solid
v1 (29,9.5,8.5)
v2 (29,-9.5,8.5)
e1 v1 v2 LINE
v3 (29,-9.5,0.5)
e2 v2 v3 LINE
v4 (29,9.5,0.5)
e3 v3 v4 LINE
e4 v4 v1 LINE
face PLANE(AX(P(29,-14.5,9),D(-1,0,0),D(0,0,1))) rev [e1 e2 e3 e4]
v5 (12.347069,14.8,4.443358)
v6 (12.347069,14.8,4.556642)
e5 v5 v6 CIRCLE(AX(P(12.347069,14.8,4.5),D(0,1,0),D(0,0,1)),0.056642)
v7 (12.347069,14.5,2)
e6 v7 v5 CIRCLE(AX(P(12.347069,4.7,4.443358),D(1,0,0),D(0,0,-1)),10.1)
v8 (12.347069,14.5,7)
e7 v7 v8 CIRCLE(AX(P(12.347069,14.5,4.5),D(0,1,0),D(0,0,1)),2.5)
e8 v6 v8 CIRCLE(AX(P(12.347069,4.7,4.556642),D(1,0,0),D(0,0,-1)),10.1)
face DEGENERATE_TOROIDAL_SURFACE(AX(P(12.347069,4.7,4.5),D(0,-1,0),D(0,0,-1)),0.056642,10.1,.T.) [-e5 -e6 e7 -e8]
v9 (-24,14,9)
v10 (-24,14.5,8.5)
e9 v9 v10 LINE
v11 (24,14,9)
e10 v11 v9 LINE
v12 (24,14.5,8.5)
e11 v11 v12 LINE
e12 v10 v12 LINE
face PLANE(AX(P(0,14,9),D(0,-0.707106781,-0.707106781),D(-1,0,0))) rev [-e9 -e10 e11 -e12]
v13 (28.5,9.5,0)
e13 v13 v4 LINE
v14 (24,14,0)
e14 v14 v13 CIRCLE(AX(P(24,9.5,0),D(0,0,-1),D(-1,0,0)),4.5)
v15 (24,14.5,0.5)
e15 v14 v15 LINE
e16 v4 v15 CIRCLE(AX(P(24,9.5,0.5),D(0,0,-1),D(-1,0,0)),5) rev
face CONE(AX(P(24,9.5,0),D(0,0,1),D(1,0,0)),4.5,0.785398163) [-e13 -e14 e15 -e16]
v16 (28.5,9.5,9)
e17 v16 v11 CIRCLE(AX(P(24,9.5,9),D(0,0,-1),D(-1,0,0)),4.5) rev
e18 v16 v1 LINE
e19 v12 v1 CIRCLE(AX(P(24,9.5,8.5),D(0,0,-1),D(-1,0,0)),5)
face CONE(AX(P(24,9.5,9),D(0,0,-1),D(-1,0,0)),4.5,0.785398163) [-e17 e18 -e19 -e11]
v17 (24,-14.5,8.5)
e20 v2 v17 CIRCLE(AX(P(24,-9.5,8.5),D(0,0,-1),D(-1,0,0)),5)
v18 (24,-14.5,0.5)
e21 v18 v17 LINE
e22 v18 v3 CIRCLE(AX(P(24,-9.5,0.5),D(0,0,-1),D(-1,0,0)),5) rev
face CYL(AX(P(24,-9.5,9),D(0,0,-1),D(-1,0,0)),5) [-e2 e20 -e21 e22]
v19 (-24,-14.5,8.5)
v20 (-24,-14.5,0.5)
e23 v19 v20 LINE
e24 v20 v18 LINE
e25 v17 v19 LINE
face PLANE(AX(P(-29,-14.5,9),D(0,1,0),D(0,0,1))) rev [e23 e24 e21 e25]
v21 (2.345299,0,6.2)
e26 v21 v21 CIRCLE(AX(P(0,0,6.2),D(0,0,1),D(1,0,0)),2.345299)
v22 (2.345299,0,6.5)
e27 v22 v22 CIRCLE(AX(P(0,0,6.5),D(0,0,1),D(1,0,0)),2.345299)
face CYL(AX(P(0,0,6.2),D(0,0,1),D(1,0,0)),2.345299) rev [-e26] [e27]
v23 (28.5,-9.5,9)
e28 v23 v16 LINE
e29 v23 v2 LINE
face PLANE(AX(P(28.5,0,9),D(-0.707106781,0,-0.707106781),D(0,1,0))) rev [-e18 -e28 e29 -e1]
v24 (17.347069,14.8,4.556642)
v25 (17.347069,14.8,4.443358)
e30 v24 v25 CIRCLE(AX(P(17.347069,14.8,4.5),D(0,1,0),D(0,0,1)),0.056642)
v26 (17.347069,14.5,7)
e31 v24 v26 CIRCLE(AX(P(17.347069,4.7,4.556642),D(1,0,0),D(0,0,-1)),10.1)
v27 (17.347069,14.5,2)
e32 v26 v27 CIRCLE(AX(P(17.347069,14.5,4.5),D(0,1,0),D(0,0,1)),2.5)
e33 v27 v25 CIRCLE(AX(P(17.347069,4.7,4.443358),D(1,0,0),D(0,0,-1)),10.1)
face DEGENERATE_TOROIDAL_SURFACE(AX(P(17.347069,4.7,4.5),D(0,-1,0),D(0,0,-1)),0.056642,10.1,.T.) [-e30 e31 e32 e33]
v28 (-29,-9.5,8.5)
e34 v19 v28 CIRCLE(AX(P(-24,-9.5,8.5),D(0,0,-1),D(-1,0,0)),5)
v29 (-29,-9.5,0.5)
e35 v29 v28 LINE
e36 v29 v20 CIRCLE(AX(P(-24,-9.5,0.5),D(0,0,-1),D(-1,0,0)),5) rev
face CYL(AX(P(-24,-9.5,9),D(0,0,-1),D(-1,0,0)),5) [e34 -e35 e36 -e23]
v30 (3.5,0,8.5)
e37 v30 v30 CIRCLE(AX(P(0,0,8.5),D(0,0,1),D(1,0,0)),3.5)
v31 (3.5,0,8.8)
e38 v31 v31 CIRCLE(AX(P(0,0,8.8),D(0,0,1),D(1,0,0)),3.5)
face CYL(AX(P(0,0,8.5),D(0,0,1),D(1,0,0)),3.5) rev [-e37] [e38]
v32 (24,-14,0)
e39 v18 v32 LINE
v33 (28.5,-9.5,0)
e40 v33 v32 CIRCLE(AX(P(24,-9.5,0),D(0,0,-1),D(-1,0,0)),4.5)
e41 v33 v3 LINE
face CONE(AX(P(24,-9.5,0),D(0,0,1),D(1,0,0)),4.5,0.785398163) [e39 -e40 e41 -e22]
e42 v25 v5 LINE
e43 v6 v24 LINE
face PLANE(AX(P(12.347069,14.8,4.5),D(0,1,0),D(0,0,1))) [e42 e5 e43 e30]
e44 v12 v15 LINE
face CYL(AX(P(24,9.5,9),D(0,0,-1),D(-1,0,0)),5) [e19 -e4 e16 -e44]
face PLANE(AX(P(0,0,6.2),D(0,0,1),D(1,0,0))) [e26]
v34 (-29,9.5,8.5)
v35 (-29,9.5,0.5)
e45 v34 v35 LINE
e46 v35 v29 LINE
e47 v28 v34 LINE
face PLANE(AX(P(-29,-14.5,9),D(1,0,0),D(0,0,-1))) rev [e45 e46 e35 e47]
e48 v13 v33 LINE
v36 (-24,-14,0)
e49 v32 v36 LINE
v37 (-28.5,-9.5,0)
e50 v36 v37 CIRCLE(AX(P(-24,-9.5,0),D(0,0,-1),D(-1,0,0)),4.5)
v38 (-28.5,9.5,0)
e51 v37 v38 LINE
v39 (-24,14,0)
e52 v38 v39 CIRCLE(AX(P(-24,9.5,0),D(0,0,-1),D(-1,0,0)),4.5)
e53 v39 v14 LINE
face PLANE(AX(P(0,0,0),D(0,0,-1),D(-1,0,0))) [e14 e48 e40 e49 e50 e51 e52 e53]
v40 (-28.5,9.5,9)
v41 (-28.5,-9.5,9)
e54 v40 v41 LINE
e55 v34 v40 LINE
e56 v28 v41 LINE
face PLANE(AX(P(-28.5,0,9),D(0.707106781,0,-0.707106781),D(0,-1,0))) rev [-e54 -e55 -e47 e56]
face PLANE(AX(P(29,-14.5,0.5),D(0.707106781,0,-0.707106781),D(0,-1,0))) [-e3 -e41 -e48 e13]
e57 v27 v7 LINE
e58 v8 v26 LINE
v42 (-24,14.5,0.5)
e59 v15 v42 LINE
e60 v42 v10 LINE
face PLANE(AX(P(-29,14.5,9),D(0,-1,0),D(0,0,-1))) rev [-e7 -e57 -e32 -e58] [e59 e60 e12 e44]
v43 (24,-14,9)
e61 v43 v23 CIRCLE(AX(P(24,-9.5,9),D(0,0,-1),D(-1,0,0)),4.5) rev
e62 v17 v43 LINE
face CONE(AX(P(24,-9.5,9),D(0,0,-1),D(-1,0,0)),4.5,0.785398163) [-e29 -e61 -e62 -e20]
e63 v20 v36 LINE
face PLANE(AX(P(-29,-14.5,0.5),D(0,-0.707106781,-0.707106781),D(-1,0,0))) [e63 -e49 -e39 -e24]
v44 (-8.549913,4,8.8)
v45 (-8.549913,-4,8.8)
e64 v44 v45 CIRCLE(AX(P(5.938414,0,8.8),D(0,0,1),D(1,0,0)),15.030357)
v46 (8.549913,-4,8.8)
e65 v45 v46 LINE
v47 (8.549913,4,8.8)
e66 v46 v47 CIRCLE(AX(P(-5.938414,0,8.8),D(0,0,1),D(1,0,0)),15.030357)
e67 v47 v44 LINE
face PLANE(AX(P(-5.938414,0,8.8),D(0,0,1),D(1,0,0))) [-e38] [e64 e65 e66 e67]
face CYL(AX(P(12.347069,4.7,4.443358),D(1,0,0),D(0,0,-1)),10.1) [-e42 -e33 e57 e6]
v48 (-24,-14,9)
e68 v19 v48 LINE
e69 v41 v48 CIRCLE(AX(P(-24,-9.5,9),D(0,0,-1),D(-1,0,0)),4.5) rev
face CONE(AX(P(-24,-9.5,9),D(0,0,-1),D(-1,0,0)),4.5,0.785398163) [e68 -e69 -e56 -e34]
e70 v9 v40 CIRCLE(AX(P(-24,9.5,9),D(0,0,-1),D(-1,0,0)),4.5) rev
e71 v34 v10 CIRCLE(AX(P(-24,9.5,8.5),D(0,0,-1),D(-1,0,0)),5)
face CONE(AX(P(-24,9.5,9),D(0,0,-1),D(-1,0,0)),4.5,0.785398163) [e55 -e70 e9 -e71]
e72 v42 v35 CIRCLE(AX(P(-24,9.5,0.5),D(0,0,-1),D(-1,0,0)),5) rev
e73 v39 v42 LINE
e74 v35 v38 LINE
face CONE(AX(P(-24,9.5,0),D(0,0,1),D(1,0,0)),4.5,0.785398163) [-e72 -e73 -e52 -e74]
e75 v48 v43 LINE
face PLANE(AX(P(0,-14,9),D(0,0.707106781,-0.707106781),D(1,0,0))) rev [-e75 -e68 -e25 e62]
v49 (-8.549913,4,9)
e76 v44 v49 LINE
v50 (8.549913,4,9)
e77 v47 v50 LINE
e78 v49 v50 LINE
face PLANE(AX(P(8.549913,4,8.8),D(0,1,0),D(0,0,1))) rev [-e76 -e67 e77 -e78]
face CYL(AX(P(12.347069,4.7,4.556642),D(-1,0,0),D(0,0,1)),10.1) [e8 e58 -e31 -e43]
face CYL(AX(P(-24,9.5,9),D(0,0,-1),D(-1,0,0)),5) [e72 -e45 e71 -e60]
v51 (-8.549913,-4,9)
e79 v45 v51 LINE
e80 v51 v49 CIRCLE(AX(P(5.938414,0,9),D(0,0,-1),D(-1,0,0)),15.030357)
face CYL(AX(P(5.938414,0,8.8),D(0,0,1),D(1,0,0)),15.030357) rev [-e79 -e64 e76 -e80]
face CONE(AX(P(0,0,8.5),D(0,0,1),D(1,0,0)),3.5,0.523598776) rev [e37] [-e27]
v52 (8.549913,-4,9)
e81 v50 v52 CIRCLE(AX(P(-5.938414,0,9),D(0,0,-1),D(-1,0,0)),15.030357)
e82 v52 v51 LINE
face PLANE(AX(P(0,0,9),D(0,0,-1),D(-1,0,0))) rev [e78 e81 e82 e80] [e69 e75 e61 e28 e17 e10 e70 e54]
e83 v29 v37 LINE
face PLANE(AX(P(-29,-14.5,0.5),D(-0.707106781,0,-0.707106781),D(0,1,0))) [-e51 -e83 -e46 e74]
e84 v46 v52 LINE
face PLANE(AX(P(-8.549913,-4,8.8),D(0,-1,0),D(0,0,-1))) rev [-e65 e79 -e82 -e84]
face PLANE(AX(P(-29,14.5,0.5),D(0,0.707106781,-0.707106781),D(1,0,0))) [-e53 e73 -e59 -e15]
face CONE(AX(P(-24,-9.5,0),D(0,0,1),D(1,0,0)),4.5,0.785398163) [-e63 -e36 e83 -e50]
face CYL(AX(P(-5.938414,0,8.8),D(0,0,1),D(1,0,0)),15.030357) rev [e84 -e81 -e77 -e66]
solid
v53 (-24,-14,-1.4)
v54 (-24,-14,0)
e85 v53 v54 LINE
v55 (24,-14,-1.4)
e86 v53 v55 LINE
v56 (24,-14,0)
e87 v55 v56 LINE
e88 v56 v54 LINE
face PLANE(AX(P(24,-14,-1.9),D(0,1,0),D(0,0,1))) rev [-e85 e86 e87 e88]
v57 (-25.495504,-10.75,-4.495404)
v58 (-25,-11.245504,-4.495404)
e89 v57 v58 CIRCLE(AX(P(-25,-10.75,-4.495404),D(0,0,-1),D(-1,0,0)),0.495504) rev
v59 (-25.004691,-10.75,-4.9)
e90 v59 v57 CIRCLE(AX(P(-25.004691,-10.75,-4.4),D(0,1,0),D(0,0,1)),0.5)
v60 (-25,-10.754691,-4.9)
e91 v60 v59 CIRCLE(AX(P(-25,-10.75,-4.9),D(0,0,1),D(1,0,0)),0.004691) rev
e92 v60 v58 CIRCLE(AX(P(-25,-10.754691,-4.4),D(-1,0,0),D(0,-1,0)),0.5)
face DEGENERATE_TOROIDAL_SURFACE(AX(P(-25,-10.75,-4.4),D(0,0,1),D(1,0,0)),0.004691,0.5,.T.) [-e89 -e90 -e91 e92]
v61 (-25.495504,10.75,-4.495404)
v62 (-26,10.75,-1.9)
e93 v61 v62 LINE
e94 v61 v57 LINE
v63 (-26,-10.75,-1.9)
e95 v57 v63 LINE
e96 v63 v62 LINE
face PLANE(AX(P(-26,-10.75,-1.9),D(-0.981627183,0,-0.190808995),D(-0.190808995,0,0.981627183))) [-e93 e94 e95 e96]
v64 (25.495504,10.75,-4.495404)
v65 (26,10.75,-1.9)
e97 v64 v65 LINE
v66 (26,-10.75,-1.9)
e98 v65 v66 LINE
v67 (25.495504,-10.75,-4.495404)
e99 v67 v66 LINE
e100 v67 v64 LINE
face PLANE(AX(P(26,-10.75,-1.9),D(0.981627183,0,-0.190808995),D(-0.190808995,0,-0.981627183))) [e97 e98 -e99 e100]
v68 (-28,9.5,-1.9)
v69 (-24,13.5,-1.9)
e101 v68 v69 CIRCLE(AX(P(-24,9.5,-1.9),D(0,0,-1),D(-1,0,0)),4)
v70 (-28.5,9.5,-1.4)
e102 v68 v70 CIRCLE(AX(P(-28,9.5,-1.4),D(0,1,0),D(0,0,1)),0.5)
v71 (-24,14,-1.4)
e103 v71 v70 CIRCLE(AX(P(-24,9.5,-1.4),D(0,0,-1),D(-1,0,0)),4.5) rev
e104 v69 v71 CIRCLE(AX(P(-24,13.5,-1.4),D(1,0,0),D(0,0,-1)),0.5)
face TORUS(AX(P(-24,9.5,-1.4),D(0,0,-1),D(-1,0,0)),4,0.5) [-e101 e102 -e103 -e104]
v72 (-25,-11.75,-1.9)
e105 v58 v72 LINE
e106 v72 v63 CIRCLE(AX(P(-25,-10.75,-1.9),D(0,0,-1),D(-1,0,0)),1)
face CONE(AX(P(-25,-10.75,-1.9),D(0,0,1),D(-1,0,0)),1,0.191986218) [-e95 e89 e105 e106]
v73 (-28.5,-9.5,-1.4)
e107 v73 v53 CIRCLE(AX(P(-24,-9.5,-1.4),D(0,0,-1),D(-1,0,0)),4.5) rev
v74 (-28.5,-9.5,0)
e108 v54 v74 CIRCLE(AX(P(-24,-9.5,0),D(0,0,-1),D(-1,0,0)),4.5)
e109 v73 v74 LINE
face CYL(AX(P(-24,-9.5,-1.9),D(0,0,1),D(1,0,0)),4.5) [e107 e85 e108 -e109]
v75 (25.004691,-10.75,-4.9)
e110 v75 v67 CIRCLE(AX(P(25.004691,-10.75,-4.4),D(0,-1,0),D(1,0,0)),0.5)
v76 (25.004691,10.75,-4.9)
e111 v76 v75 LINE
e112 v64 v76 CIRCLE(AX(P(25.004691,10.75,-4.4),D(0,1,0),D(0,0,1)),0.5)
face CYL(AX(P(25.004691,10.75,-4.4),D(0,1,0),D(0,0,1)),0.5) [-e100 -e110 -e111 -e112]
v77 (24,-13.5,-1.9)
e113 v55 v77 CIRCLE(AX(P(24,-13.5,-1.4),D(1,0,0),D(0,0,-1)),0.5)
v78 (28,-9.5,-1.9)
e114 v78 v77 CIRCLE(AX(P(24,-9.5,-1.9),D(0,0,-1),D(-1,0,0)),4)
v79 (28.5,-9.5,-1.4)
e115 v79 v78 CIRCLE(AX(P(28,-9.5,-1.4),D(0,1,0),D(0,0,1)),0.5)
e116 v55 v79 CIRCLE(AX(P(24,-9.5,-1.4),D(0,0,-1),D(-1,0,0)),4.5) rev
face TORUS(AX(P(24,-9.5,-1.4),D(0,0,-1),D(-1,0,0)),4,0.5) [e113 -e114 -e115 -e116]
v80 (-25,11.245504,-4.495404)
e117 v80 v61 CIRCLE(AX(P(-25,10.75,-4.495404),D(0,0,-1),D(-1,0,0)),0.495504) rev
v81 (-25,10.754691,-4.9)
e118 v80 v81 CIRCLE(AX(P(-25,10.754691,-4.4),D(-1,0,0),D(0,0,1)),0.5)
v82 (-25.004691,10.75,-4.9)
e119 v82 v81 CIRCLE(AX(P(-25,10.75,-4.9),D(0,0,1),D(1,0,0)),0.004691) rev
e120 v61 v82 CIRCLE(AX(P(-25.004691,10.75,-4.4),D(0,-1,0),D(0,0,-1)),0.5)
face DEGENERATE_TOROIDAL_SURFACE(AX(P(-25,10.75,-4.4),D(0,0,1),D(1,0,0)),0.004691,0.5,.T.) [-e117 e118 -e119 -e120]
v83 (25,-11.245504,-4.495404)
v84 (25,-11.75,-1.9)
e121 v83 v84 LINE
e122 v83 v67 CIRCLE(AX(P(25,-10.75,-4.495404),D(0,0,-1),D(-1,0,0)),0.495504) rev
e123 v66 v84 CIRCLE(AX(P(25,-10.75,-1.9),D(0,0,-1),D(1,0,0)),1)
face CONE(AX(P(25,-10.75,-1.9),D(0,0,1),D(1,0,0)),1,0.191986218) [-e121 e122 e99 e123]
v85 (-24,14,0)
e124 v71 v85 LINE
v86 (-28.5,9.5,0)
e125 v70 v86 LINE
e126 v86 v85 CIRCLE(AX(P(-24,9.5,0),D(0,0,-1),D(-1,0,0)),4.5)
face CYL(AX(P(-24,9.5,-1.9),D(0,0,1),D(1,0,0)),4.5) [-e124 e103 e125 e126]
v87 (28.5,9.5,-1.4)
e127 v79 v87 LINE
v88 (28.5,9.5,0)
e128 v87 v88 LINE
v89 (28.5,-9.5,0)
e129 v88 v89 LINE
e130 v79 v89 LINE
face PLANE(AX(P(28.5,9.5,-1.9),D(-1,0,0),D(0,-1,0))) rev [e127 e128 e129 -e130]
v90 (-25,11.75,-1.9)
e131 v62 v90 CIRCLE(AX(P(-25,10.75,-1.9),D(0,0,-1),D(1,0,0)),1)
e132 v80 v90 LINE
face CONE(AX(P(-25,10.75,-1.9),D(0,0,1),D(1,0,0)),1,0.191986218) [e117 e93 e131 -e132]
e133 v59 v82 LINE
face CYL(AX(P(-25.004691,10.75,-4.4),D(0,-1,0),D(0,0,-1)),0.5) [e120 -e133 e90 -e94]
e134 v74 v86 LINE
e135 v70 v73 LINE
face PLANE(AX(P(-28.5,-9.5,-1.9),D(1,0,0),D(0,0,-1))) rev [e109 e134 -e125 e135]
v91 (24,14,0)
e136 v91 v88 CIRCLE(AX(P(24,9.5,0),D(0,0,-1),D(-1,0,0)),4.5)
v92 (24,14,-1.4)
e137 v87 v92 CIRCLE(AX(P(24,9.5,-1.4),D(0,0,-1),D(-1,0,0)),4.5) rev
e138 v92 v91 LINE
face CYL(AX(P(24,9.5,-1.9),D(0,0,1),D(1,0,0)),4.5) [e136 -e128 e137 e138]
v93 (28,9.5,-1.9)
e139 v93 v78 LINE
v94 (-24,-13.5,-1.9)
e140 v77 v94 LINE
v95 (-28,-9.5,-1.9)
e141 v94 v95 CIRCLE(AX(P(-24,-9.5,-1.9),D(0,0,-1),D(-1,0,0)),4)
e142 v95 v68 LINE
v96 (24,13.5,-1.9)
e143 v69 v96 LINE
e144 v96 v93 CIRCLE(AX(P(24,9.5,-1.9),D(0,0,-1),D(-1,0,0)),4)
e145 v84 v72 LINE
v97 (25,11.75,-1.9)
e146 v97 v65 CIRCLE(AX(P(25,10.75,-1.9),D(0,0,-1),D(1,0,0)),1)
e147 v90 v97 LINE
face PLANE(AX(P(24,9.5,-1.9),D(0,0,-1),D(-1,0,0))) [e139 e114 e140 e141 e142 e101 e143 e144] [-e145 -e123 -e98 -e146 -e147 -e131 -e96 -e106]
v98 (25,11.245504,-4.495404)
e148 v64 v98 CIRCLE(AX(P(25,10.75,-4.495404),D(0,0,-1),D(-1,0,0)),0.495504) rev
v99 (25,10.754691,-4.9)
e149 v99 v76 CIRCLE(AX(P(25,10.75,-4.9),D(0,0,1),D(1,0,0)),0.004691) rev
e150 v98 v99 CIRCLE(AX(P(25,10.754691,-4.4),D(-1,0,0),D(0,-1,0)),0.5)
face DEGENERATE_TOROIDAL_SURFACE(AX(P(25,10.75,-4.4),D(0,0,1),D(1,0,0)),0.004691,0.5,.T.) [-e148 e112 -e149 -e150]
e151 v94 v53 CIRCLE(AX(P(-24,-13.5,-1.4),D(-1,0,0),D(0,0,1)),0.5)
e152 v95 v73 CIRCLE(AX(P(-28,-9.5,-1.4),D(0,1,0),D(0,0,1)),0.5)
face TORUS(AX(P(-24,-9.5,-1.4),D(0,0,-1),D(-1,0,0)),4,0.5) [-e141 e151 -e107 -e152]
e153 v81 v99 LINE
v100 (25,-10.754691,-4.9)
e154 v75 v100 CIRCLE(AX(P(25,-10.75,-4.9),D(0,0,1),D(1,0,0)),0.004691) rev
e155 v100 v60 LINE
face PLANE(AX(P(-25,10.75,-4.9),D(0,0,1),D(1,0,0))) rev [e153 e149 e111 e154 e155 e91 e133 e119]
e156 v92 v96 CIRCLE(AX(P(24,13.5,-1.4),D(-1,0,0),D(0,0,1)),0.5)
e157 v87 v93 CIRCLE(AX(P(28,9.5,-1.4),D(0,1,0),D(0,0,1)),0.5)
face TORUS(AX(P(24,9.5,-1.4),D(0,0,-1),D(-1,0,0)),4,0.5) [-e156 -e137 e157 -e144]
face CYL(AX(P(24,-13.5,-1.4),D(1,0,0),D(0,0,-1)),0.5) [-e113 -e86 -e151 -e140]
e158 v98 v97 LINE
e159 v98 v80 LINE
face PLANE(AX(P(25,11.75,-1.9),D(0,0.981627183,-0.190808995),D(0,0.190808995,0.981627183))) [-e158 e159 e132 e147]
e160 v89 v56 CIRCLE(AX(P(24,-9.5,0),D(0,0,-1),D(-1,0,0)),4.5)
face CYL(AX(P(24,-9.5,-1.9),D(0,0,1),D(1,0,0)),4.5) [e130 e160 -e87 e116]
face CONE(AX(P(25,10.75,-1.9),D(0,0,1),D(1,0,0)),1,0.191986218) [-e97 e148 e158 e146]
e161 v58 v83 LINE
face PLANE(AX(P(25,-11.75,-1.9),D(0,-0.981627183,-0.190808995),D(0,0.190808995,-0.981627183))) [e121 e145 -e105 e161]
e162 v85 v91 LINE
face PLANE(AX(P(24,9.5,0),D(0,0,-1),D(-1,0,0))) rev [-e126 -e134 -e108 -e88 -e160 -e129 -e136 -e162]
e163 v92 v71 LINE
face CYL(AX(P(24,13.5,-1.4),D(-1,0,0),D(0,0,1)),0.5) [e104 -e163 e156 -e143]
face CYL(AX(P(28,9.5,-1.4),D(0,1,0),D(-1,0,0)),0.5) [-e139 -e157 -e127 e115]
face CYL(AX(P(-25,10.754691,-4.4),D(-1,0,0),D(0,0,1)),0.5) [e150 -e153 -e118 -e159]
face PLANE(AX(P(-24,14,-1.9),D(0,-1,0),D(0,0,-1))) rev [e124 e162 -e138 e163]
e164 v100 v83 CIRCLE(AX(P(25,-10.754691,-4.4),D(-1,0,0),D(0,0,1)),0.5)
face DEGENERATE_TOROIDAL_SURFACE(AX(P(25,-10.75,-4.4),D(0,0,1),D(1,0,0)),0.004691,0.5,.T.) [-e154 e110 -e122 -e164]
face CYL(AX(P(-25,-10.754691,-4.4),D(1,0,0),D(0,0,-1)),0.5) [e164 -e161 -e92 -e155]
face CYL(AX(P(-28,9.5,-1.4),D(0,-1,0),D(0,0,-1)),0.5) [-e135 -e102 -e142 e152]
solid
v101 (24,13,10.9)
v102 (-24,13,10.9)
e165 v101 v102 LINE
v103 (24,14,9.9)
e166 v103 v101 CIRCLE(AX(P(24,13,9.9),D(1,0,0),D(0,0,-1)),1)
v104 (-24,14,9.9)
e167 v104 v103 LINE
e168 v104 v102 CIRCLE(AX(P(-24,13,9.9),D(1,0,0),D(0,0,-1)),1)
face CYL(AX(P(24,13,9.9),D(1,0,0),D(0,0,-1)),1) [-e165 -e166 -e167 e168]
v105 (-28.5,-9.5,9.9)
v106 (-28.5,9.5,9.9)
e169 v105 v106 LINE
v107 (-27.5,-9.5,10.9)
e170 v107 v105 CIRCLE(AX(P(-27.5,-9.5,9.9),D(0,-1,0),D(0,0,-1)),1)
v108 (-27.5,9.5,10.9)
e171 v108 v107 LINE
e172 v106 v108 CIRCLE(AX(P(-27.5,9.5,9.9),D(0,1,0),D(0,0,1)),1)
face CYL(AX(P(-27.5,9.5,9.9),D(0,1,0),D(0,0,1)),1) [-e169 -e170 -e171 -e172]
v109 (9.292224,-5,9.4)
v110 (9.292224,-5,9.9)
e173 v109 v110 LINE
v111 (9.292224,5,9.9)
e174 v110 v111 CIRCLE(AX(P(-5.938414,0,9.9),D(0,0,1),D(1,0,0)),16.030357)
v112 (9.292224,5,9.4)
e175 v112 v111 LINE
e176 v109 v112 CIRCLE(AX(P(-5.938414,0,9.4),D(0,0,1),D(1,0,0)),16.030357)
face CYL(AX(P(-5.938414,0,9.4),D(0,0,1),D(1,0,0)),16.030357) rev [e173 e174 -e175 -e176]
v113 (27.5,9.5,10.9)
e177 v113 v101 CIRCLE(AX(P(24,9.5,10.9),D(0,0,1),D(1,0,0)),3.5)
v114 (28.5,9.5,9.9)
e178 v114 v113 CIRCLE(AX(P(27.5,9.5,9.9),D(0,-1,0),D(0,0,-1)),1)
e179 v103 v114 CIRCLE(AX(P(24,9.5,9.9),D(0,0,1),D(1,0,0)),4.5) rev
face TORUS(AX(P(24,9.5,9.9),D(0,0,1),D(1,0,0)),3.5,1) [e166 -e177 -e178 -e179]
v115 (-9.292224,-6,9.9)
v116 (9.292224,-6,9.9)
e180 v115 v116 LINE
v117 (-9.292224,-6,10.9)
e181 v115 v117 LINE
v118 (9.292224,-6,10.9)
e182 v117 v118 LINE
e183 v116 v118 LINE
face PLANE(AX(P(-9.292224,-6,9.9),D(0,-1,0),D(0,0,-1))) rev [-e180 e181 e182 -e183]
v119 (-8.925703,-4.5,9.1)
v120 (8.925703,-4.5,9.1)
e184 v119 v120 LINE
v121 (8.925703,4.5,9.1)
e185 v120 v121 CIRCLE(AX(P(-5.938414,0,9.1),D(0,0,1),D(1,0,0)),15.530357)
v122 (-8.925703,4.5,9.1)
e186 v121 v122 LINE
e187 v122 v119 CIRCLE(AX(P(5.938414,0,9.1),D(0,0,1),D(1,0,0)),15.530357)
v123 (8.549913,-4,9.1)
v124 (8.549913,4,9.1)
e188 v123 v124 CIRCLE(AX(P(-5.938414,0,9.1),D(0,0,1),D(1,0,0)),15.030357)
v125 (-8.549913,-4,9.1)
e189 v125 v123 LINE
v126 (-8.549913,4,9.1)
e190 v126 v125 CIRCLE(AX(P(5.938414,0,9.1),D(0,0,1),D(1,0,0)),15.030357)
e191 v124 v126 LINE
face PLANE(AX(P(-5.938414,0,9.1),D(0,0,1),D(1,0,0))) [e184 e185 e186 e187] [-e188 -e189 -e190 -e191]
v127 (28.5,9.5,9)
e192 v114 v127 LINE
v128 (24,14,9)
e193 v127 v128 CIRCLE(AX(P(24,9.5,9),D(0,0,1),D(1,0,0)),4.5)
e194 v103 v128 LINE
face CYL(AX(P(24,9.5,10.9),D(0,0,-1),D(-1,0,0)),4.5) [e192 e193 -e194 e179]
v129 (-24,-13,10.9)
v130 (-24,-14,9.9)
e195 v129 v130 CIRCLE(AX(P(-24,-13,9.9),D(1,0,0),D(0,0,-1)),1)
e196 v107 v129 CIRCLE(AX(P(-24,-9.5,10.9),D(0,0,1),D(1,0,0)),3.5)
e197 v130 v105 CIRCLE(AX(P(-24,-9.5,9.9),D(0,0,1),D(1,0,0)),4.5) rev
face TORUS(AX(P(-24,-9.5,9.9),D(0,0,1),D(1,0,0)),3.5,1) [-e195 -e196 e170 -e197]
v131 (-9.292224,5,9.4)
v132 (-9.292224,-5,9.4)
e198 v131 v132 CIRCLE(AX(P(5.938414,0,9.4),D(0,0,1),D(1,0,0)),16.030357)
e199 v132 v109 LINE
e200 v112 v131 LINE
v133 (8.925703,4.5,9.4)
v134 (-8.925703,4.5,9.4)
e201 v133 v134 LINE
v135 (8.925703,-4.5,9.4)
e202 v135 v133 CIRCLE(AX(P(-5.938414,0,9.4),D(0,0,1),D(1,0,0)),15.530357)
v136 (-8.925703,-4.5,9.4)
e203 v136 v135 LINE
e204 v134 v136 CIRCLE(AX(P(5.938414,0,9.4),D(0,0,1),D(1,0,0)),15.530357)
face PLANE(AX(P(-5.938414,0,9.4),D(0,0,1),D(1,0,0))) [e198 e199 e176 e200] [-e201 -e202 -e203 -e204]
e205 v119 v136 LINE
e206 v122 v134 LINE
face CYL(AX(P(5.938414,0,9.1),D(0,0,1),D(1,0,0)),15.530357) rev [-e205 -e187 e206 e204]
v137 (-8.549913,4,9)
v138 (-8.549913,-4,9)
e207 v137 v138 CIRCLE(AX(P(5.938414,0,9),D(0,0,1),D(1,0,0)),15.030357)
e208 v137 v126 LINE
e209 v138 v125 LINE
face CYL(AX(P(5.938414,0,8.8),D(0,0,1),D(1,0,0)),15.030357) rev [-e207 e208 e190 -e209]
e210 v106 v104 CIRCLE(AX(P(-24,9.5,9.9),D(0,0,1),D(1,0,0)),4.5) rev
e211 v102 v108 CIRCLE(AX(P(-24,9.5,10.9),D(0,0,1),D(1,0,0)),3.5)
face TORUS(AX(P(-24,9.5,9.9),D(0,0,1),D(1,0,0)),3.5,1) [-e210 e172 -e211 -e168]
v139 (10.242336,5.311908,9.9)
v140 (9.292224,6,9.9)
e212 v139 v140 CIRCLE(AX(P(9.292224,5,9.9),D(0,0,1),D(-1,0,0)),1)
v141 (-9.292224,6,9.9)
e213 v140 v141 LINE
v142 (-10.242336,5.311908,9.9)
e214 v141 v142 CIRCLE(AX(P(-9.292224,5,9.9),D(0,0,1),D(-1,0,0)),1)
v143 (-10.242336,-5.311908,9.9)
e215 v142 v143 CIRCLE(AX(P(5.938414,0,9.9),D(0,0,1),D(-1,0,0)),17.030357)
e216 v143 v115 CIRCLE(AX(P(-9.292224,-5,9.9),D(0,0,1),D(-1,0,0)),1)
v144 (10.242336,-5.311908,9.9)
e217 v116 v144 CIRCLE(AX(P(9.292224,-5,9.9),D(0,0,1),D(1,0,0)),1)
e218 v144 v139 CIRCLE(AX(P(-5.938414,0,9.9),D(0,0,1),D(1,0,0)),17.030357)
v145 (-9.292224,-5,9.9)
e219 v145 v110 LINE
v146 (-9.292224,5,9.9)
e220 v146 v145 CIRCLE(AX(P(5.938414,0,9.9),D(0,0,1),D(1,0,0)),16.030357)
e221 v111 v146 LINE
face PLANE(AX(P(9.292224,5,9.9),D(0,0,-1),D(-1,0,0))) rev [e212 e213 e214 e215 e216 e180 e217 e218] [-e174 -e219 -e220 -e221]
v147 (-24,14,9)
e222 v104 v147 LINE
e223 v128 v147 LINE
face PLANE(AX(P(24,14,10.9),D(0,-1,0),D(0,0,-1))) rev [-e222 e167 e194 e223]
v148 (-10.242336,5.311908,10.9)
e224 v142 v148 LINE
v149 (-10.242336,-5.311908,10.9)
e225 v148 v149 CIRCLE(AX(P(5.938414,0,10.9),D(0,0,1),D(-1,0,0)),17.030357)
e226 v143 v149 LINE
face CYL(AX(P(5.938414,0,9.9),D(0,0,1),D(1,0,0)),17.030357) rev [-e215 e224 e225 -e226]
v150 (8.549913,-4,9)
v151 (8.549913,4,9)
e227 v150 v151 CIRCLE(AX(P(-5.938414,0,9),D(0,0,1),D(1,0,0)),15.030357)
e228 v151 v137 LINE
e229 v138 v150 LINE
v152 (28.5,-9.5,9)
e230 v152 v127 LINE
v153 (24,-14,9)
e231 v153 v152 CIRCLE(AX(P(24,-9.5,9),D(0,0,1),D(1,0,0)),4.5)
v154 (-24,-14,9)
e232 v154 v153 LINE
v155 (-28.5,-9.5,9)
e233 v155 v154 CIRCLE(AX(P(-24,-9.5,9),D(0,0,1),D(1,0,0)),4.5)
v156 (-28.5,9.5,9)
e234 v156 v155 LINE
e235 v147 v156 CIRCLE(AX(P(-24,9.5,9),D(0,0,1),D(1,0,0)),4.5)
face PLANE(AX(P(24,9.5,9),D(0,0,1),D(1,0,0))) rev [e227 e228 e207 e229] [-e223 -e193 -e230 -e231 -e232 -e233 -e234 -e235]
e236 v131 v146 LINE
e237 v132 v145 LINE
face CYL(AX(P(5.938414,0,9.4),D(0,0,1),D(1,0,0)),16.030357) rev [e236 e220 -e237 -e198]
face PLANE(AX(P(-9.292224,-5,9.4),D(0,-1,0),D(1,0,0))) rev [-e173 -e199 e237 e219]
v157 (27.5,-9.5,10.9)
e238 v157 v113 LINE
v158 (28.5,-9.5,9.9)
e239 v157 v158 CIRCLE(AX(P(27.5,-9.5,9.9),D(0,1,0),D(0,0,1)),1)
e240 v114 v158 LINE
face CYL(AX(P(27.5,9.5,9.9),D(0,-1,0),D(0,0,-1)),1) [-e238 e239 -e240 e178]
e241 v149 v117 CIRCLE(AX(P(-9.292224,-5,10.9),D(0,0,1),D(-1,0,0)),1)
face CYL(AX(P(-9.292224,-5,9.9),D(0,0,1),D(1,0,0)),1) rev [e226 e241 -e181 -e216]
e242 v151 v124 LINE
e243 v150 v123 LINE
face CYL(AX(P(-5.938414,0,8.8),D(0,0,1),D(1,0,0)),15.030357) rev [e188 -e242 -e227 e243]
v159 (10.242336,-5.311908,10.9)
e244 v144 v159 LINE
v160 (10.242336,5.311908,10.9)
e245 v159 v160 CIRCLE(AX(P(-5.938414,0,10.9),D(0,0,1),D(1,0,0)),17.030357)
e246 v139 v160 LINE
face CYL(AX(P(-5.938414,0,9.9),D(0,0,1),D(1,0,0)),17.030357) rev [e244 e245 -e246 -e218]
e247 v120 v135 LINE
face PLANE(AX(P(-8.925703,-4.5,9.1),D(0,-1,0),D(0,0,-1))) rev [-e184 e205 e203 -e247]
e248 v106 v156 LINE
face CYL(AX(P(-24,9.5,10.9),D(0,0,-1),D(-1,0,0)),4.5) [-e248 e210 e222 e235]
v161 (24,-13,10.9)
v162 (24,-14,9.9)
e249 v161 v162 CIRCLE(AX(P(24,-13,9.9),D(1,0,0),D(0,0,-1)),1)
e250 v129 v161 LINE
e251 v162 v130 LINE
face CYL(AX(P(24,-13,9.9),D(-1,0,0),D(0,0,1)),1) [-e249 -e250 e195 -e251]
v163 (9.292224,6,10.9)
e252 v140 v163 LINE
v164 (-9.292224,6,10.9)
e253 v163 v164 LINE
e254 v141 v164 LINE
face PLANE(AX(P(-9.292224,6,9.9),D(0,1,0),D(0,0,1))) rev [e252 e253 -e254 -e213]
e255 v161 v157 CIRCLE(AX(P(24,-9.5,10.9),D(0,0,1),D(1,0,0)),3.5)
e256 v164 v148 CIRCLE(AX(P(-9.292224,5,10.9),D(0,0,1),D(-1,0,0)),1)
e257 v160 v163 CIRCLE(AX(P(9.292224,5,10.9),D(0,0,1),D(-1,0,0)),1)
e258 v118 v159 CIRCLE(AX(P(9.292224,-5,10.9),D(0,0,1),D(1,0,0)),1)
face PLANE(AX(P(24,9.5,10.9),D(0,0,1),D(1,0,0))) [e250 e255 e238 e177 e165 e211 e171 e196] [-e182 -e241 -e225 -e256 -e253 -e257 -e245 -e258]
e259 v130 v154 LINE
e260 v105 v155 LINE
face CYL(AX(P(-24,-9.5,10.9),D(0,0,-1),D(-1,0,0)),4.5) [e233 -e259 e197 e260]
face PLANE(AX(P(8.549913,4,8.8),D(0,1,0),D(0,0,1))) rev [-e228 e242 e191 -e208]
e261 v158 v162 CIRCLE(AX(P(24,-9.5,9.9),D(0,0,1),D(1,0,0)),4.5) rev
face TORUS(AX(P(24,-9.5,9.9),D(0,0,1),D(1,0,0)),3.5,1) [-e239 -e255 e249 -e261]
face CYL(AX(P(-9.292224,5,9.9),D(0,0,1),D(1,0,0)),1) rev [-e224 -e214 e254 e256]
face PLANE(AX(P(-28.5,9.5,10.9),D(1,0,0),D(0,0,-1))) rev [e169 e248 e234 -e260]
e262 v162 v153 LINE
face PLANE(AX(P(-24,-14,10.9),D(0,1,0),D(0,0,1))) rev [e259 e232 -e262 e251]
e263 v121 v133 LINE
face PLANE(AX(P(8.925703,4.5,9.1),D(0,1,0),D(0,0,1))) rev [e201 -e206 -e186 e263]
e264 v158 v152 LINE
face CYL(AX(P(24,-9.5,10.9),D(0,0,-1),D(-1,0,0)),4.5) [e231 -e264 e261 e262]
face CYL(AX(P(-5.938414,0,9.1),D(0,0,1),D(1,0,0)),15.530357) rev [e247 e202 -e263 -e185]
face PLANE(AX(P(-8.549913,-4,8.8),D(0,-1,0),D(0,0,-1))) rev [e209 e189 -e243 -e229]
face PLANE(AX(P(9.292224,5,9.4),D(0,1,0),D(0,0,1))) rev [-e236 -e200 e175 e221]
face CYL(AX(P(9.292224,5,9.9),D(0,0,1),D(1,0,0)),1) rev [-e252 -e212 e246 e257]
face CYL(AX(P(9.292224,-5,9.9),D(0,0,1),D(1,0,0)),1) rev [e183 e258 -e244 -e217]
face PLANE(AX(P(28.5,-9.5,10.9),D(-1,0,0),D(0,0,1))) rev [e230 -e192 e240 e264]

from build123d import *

# Parameters (mm, degrees)
SKETCH_1_W          = 58
SKETCH_1_H          = 29
EXTRUDE_1_DEPTH     = 9
FILLET_1_R          = 5
CHAMFER_1_SIZE      = 0.5
EXTRUDE_2_DEPTH     = 1.9
FILLET_2_R          = 1
EXTRUDE_3_DEPTH     = 1.9
FILLET_3_R          = 0.5
EXTRUDE_4_DEPTH     = 3
EXTRUDE_4_TAPER     = 11.000000000000002
FILLET_4_R          = 0.5
CUT_EXTRUDE_1_DEPTH = 1
CUT_EXTRUDE_2_DEPTH = 0.5
CUT_EXTRUDE_3_DEPTH = 0.3
CUT_EXTRUDE_4_DEPTH = 0.3
SKETCH_9_R          = 3.5
CUT_EXTRUDE_5_DEPTH = 0.3
SKETCH_10_R         = 3.5
CUT_EXTRUDE_6_DEPTH = 2
CUT_EXTRUDE_6_DRAFT = -30.000000000000068
SKETCH_11_R         = 2.345299461620746
CUT_EXTRUDE_7_DEPTH = 0.3
EXTRUDE_5_DEPTH     = 0.3
FILLET_5_R          = 10.1


with BuildPart() as part:
    # 스케치1 → 보스-돌출1 (new body)
    with BuildSketch(Plane.XY):
        Rectangle(SKETCH_1_W, SKETCH_1_H)
    extrude(amount=EXTRUDE_1_DEPTH)

    # 필렛1
    fillet_1_edges = [part.edges().sort_by_distance(p)[0] for p in [
        (29.00000000000001, -14.499999999999998, 4.5),
        (-28.999999999999986, -14.499999999999998, 4.5),
        (-28.999999999999986, 14.500000000000002, 4.5),
        (29.00000000000001, 14.500000000000002, 4.5),
    ]]
    fillet(fillet_1_edges, radius=FILLET_1_R)

    # 모따기1
    chamfer_1_edges = [part.edges().sort_by_distance(p)[0] for p in [
        (1.421e-14, -14.499999999999998, 0),
        (1.421e-14, -14.499999999999998, 9),
        (29.00000000000001, 0, 0),
        (-28.999999999999986, 3.55e-15, 0),
        (1.066e-14, 14.500000000000002, 0),
        (-27.535533905932724, 13.035533905932741, 0),
        (27.53553390593275, 13.035533905932741, 0),
        (27.535533905932752, -13.035533905932738, 0),
        (-27.535533905932724, -13.035533905932738, 0),
        (-28.999999999999986, 3.55e-15, 9),
        (29.00000000000001, 0, 9),
        (1.066e-14, 14.500000000000002, 9),
        (-27.535533905932724, 13.035533905932741, 9),
        (27.53553390593275, 13.035533905932741, 9),
        (27.535533905932752, -13.035533905932738, 9),
        (-27.535533905932724, -13.035533905932738, 9),
    ]]
    chamfer(chamfer_1_edges, length=CHAMFER_1_SIZE)


with BuildPart() as body_2:
    # 스케치2 → 보스-돌출2 (new body)
    with BuildSketch(Plane.XY.offset(9)):
        with BuildLine():
            Line((24.000000000000007, 14.000000000000009), (-23.999999999999982, 14.000000000000009))
            ThreePointArc((-23.999999999999982, 14.000000000000009), (-27.18198051533945, 12.681980515339472), (-28.49999999999999, 9.500000000000002))
            Line((-28.49999999999999, 9.500000000000002), (-28.49999999999999, -9.499999999999998))
            ThreePointArc((-28.49999999999999, -9.499999999999998), (-27.18198051533945, -12.681980515339466), (-23.999999999999982, -14.000000000000005))
            Line((-23.999999999999982, -14.000000000000005), (24.000000000000007, -14.000000000000005))
            ThreePointArc((24.000000000000007, -14.000000000000005), (27.18198051533948, -12.681980515339468), (28.500000000000018, -9.499999999999998))
            Line((28.500000000000018, -9.499999999999998), (28.500000000000018, 9.500000000000002))
            ThreePointArc((28.500000000000018, 9.500000000000002), (27.18198051533948, 12.681980515339472), (24.000000000000007, 14.000000000000009))
        make_face()
    extrude(amount=EXTRUDE_2_DEPTH)

    # 필렛2
    fillet_2_edges = [body_2.edges().sort_by_distance(p)[0] for p in [
        (-27.18198051533945, 12.681980515339472, 10.9),
        (-28.49999999999999, 1.78e-15, 10.9),
        (-27.18198051533945, -12.681980515339466, 10.9),
        (1.066e-14, -14.000000000000005, 10.9),
        (27.18198051533948, -12.681980515339468, 10.9),
        (28.500000000000018, 1.78e-15, 10.9),
        (27.18198051533948, 12.681980515339472, 10.9),
        (1.421e-14, 14.000000000000009, 10.9),
    ]]
    fillet(fillet_2_edges, radius=FILLET_2_R)

    # 스케치5 → 컷-돌출1 (cut)
    with BuildSketch(Plane.XY.offset(10.9)):
        with BuildLine():
            Line((-9.292223801942907, -6), (9.292223801942903, -6))
            ThreePointArc((9.292223801942903, -6), (9.878778053424123, -5.809909939480499), (10.242336038581271, -5.311908220138612))
            ThreePointArc((10.242336038581271, -5.311908220138612), (11.091942439359082, 0), (10.242336038581271, 5.311908220138612))
            ThreePointArc((10.242336038581271, 5.311908220138612), (9.878778053424123, 5.809909939480499), (9.292223801942903, 6))
            Line((9.292223801942903, 6), (-9.292223801942907, 6))
            ThreePointArc((-9.292223801942907, 6), (-9.878778053424126, 5.809909939480499), (-10.242336038581275, 5.311908220138612))
            ThreePointArc((-10.242336038581275, 5.311908220138612), (-11.091942439359089, -2.09e-15), (-10.242336038581275, -5.311908220138612))
            ThreePointArc((-10.242336038581275, -5.311908220138612), (-9.878778053424126, -5.8099099394805), (-9.292223801942907, -6))
        make_face()
    extrude(amount=-CUT_EXTRUDE_1_DEPTH, mode=Mode.SUBTRACT)

    # 스케치6 → 컷-돌출2 (cut)
    with BuildSketch(Plane.XY.offset(9.899999999999999)):
        with BuildLine():
            Line((9.292223801942903, 5), (-9.292223801942907, 5))
            ThreePointArc((-9.292223801942907, 5), (-10.091942439359086, 1.96e-15), (-9.292223801942907, -4.999999999999998))
            Line((-9.292223801942907, -4.999999999999998), (9.292223801942903, -5))
            ThreePointArc((9.292223801942903, -5), (10.091942439359086, -1.78e-15), (9.292223801942903, 5))
        make_face()
    extrude(amount=-CUT_EXTRUDE_2_DEPTH, mode=Mode.SUBTRACT)

    # 스케치7 → 컷-돌출3 (cut)
    with BuildSketch(Plane.XY.offset(9.399999999999999)):
        with BuildLine():
            Line((8.92570290507378, 4.500000000000001), (-8.925702905073786, 4.500000000000001))
            ThreePointArc((-8.925702905073786, 4.500000000000001), (-9.591942439359087, 1.9e-15), (-8.92570290507379, -4.499999999999992))
            Line((-8.92570290507379, -4.499999999999992), (8.925702905073784, -4.499999999999992))
            ThreePointArc((8.925702905073784, -4.499999999999992), (9.591942439359084, 4.31e-15), (8.92570290507378, 4.500000000000001))
        make_face()
    extrude(amount=-CUT_EXTRUDE_3_DEPTH, mode=Mode.SUBTRACT)


with BuildPart() as body_3:
    # 스케치3 → 보스-돌출3 (new body)
    with BuildSketch(Plane(origin=(0, 0, 0), x_dir=(-1, 0, 0), z_dir=(0, 0, -1))):
        with BuildLine():
            Line((-28.500000000000007, 9.500000000000002), (-28.50000000000001, -9.499999999999998))
            ThreePointArc((-28.50000000000001, -9.499999999999998), (-27.181980515339475, -12.681980515339463), (-24.000000000000007, -13.999999999999998))
            Line((-24.000000000000007, -13.999999999999998), (23.999999999999982, -13.999999999999998))
            ThreePointArc((23.999999999999982, -13.999999999999998), (27.181980515339447, -12.681980515339461), (28.499999999999982, -9.499999999999998))
            Line((28.499999999999982, -9.499999999999998), (28.499999999999982, 9.500000000000002))
            ThreePointArc((28.499999999999982, 9.500000000000002), (27.181980515339447, 12.681980515339465), (23.999999999999982, 14.000000000000002))
            Line((23.999999999999982, 14.000000000000002), (-24.000000000000007, 14.000000000000002))
            ThreePointArc((-24.000000000000007, 14.000000000000002), (-27.181980515339472, 12.681980515339466), (-28.500000000000007, 9.500000000000002))
        make_face()
    extrude(amount=EXTRUDE_3_DEPTH)

    # 필렛3
    fillet_3_edges = [body_3.edges().sort_by_distance(p)[0] for p in [
        (27.181980515339475, -12.681980515339465, -1.9),
        (1.421e-14, -13.999999999999998, -1.9),
        (-27.181980515339447, -12.681980515339463, -1.9),
        (-28.499999999999982, 1.78e-15, -1.9),
        (-27.181980515339447, 12.681980515339466, -1.9),
        (1.066e-14, 14.000000000000002, -1.9),
        (27.181980515339472, 12.681980515339466, -1.9),
        (28.500000000000007, 1.78e-15, -1.9),
    ]]
    fillet(fillet_3_edges, radius=FILLET_3_R)

    # 스케치4 → 보스-돌출4 (add)
    with BuildSketch(Plane(origin=(0, 0, -1.9), x_dir=(-1, 0, 0), z_dir=(0, 0, -1))):
        with BuildLine():
            Line((-24.99999999999999, -11.75), (24.99999999999999, -11.75))
            ThreePointArc((24.99999999999999, -11.75), (25.707106781186543, -11.457106781186548), (26, -10.749999999999993))
            Line((26, -10.749999999999993), (26, 10.749999999999993))
            ThreePointArc((26, 10.749999999999993), (25.707106781186543, 11.457106781186548), (24.99999999999999, 11.75))
            Line((24.99999999999999, 11.75), (-24.99999999999999, 11.75))
            ThreePointArc((-24.99999999999999, 11.75), (-25.707106781186546, 11.45710678118655), (-26, 10.749999999999993))
            Line((-26, 10.749999999999993), (-26, -10.749999999999993))
            ThreePointArc((-26, -10.749999999999993), (-25.707106781186543, -11.457106781186548), (-24.99999999999999, -11.75))
        make_face()
    extrude(amount=EXTRUDE_4_DEPTH, taper=EXTRUDE_4_TAPER)

    # 필렛4
    fillet_4_edges = [body_3.edges().sort_by_distance(p)[0] for p in [
        (-25.29476387702529, 11.044763877025291, -4.9),
        (7.24e-15, 11.166859072586844, -4.9),
        (25.294763877025293, 11.044763877025293, -4.9),
        (25.416859072586846, 5.28e-15, -4.9),
        (25.29476387702529, -11.044763877025291, -4.9),
        (1.4e-16, -11.166859072586844, -4.9),
        (-25.29476387702529, -11.044763877025291, -4.9),
        (-25.416859072586846, -5e-17, -4.9),
    ]]
    fillet(fillet_4_edges, radius=FILLET_4_R)


with BuildPart() as cut_extrude_4_tool:
    # 스케치8 → 컷-돌출4 (new body)
    with BuildSketch(Plane.XY.offset(9.099999999999998)):
        with BuildLine():
            Line((8.549912849042506, 4), (-8.54991284904251, 4))
            ThreePointArc((-8.54991284904251, 4), (-9.091942439359086, 8.52e-15), (-8.549912849042514, -3.9999999999999916))
            Line((-8.549912849042514, -3.9999999999999916), (8.549912849042508, -3.9999999999999916))
            ThreePointArc((8.549912849042508, -3.9999999999999916), (9.091942439359082, 4.17e-15), (8.549912849042506, 4))
        make_face()
    extrude(amount=-CUT_EXTRUDE_4_DEPTH)


with BuildPart() as part_1:
    add(part.part)

    # 컷-돌출4: cut by cut_extrude_4_tool
    add(cut_extrude_4_tool.part, mode=Mode.SUBTRACT)

    # 스케치9 → 컷-돌출5 (cut)
    with BuildSketch(Plane.XY.offset(8.799999999999999)):
        Circle(SKETCH_9_R)
    extrude(amount=-CUT_EXTRUDE_5_DEPTH, mode=Mode.SUBTRACT)


with BuildPart() as body_2_1:
    add(body_2.part)

    # 컷-돌출4: cut by cut_extrude_4_tool
    add(cut_extrude_4_tool.part, mode=Mode.SUBTRACT)


with BuildPart() as cut_extrude_6_tool:
    # 스케치10 → 컷-돌출6 (with draft: the straight prism first)
    with BuildSketch(Plane.XY.offset(8.499999999999998)):
        Circle(SKETCH_10_R)
    extrude(amount=-CUT_EXTRUDE_6_DEPTH)
    # 컷-돌출6: the draft: its side faces are tilted about the plane it starts from
    cut_extrude_6_sides = [cut_extrude_6_tool.faces().sort_by_distance(p)[0] for p in [
        (-3.5, 0, 7.5),
    ]]
    draft(cut_extrude_6_sides, Plane.XY.offset(8.499999999999998), CUT_EXTRUDE_6_DRAFT)


with BuildPart() as part_2:
    add(part_1.part)

    # 컷-돌출6: cut by cut_extrude_6_tool
    add(cut_extrude_6_tool.part, mode=Mode.SUBTRACT)

    # 스케치11 → 컷-돌출7 (cut)
    with BuildSketch(Plane.XY.offset(6.499999999999999)):
        Circle(SKETCH_11_R)
    extrude(amount=-CUT_EXTRUDE_7_DEPTH, mode=Mode.SUBTRACT)

    # 스케치12 → 보스-돌출5 (add)
    with BuildSketch(Plane(origin=(0, 14.500000000000002, 0), x_dir=(1, 0, 0), z_dir=(0, 1, 0))):
        with BuildLine():
            Line((12.34706947778462, -1.9999999999999958), (17.347069477784625, -1.9999999999999958))
            ThreePointArc((17.347069477784625, -1.9999999999999958), (19.847069477784625, -4.4999999999999964), (17.347069477784625, -6.9999999999999964))
            Line((17.347069477784625, -6.9999999999999964), (12.34706947778462, -6.9999999999999964))
            ThreePointArc((12.34706947778462, -6.9999999999999964), (9.847069477784618, -4.4999999999999964), (12.34706947778462, -1.9999999999999958))
        make_face()
    extrude(amount=EXTRUDE_5_DEPTH)

    # 필렛5
    # the kernel refuses this fillet: 10.1 mm, written as the material it takes off along each edge
    with BuildSketch(Plane(origin=(12.34706947778462, 14.800000000000002, 1.9999999999999958), x_dir=(0, -1, -7.4e-16), z_dir=(1, 0, 0))) as fillet_5_piece_1:
        with BuildLine():
            CenterArc((10.099999999999998, -2.443358344574135), FILLET_5_R, 166.00030870158, 13.999691298419975)
            Line((-1.81e-15, -2.4433583445741274), (-0.20200000000000176, -2.4433583445741274))
            Line((-0.20200000000000176, -2.4433583445741274), (-0.20199999999999996, 1.5e-16))
            Line((-0.20199999999999996, 1.5e-16), (1.5e-16, 0.20199999999999996))
            ThreePointArc((1.5e-16, 0.20199999999999996), (0.1500000000000005, 0.20199999999999985), (0.10400000000000102, 0.04886716689148277))
            Line((0.10400000000000102, 0.04886716689148277), (0.3000000000000007, 0))
        make_face()
    extrude(amount=5.000000000000005, mode=Mode.SUBTRACT)
    with BuildSketch(Plane(origin=(17.347069477784625, 14.800000000000002, 6.9999999999999964), x_dir=(0, -1, 0), z_dir=(-1, 0, 0))) as fillet_5_piece_2:
        with BuildLine():
            CenterArc((10.1, -2.443358344574124), FILLET_5_R, 166.00030870158005, 13.999691298419947)
            Line((0, -2.443358344574124), (-0.20199999999999996, -2.443358344574124))
            Line((-0.20199999999999996, -2.443358344574124), (-0.20199999999999996, 0))
            Line((-0.20199999999999996, 0), (0, 0.20199999999999996))
            ThreePointArc((0, 0.20199999999999996), (0.15000000000000036, 0.20199999999999996), (0.10400000000000098, 0.04886716689148241))
            Line((0.10400000000000098, 0.04886716689148241), (0.3000000000000007, 0))
        make_face()
    extrude(amount=5.000000000000005, mode=Mode.SUBTRACT)
    with BuildSketch(Plane(origin=(17.347069477784625, 14.800000000000002, 4.4999999999999964), x_dir=(0, 0, -1), z_dir=(-1, 0, 0))) as fillet_5_piece_3:
        with BuildLine():
            CenterArc((0.05664165542587529, 10.1), FILLET_5_R, 270, 13.999691298419975)
            Line((0.05664165542587529, 0), (0.05664165542587529, -0.20199999999999996))
            Line((0.05664165542587529, -0.20199999999999996), (2.5000000000000004, -0.20199999999999996))
            Line((2.5000000000000004, -0.20199999999999996), (2.7020000000000004, 0))
            ThreePointArc((2.7020000000000004, 0), (2.7020000000000004, 0.15000000000000036), (2.548867166891483, 0.10400000000000098))
            Line((2.548867166891483, 0.10400000000000098), (2.5000000000000004, 0.3000000000000007))
        make_face()
    revolve(axis=Axis((17.347069477784625, 14.800000000000002, 4.4999999999999964), (0, -1, 0)), revolution_arc=180, mode=Mode.SUBTRACT)
    with BuildSketch(Plane(origin=(12.347069477784618, 14.800000000000002, 4.4999999999999964), x_dir=(7.1e-16, 0, 1), z_dir=(1, 0, -7.1e-16))) as fillet_5_piece_4:
        with BuildLine():
            CenterArc((0.0566416554258744, 10.1), FILLET_5_R, 270, 13.999691298419975)
            Line((0.0566416554258744, 0), (0.0566416554258744, -0.20199999999999996))
            Line((0.0566416554258744, -0.20199999999999996), (2.5, -0.20199999999999996))
            Line((2.5, -0.20199999999999996), (2.702, 0))
            ThreePointArc((2.702, 0), (2.702, 0.15000000000000036), (2.5488671668914824, 0.10400000000000098))
            Line((2.5488671668914824, 0.10400000000000098), (2.5, 0.3000000000000007))
        make_face()
    revolve(axis=Axis((12.347069477784618, 14.800000000000002, 4.4999999999999964), (0, -1, 0)), revolution_arc=180.00000000000009, mode=Mode.SUBTRACT)


solid = Compound([body_3.part, body_2_1.part, part_2.part])
